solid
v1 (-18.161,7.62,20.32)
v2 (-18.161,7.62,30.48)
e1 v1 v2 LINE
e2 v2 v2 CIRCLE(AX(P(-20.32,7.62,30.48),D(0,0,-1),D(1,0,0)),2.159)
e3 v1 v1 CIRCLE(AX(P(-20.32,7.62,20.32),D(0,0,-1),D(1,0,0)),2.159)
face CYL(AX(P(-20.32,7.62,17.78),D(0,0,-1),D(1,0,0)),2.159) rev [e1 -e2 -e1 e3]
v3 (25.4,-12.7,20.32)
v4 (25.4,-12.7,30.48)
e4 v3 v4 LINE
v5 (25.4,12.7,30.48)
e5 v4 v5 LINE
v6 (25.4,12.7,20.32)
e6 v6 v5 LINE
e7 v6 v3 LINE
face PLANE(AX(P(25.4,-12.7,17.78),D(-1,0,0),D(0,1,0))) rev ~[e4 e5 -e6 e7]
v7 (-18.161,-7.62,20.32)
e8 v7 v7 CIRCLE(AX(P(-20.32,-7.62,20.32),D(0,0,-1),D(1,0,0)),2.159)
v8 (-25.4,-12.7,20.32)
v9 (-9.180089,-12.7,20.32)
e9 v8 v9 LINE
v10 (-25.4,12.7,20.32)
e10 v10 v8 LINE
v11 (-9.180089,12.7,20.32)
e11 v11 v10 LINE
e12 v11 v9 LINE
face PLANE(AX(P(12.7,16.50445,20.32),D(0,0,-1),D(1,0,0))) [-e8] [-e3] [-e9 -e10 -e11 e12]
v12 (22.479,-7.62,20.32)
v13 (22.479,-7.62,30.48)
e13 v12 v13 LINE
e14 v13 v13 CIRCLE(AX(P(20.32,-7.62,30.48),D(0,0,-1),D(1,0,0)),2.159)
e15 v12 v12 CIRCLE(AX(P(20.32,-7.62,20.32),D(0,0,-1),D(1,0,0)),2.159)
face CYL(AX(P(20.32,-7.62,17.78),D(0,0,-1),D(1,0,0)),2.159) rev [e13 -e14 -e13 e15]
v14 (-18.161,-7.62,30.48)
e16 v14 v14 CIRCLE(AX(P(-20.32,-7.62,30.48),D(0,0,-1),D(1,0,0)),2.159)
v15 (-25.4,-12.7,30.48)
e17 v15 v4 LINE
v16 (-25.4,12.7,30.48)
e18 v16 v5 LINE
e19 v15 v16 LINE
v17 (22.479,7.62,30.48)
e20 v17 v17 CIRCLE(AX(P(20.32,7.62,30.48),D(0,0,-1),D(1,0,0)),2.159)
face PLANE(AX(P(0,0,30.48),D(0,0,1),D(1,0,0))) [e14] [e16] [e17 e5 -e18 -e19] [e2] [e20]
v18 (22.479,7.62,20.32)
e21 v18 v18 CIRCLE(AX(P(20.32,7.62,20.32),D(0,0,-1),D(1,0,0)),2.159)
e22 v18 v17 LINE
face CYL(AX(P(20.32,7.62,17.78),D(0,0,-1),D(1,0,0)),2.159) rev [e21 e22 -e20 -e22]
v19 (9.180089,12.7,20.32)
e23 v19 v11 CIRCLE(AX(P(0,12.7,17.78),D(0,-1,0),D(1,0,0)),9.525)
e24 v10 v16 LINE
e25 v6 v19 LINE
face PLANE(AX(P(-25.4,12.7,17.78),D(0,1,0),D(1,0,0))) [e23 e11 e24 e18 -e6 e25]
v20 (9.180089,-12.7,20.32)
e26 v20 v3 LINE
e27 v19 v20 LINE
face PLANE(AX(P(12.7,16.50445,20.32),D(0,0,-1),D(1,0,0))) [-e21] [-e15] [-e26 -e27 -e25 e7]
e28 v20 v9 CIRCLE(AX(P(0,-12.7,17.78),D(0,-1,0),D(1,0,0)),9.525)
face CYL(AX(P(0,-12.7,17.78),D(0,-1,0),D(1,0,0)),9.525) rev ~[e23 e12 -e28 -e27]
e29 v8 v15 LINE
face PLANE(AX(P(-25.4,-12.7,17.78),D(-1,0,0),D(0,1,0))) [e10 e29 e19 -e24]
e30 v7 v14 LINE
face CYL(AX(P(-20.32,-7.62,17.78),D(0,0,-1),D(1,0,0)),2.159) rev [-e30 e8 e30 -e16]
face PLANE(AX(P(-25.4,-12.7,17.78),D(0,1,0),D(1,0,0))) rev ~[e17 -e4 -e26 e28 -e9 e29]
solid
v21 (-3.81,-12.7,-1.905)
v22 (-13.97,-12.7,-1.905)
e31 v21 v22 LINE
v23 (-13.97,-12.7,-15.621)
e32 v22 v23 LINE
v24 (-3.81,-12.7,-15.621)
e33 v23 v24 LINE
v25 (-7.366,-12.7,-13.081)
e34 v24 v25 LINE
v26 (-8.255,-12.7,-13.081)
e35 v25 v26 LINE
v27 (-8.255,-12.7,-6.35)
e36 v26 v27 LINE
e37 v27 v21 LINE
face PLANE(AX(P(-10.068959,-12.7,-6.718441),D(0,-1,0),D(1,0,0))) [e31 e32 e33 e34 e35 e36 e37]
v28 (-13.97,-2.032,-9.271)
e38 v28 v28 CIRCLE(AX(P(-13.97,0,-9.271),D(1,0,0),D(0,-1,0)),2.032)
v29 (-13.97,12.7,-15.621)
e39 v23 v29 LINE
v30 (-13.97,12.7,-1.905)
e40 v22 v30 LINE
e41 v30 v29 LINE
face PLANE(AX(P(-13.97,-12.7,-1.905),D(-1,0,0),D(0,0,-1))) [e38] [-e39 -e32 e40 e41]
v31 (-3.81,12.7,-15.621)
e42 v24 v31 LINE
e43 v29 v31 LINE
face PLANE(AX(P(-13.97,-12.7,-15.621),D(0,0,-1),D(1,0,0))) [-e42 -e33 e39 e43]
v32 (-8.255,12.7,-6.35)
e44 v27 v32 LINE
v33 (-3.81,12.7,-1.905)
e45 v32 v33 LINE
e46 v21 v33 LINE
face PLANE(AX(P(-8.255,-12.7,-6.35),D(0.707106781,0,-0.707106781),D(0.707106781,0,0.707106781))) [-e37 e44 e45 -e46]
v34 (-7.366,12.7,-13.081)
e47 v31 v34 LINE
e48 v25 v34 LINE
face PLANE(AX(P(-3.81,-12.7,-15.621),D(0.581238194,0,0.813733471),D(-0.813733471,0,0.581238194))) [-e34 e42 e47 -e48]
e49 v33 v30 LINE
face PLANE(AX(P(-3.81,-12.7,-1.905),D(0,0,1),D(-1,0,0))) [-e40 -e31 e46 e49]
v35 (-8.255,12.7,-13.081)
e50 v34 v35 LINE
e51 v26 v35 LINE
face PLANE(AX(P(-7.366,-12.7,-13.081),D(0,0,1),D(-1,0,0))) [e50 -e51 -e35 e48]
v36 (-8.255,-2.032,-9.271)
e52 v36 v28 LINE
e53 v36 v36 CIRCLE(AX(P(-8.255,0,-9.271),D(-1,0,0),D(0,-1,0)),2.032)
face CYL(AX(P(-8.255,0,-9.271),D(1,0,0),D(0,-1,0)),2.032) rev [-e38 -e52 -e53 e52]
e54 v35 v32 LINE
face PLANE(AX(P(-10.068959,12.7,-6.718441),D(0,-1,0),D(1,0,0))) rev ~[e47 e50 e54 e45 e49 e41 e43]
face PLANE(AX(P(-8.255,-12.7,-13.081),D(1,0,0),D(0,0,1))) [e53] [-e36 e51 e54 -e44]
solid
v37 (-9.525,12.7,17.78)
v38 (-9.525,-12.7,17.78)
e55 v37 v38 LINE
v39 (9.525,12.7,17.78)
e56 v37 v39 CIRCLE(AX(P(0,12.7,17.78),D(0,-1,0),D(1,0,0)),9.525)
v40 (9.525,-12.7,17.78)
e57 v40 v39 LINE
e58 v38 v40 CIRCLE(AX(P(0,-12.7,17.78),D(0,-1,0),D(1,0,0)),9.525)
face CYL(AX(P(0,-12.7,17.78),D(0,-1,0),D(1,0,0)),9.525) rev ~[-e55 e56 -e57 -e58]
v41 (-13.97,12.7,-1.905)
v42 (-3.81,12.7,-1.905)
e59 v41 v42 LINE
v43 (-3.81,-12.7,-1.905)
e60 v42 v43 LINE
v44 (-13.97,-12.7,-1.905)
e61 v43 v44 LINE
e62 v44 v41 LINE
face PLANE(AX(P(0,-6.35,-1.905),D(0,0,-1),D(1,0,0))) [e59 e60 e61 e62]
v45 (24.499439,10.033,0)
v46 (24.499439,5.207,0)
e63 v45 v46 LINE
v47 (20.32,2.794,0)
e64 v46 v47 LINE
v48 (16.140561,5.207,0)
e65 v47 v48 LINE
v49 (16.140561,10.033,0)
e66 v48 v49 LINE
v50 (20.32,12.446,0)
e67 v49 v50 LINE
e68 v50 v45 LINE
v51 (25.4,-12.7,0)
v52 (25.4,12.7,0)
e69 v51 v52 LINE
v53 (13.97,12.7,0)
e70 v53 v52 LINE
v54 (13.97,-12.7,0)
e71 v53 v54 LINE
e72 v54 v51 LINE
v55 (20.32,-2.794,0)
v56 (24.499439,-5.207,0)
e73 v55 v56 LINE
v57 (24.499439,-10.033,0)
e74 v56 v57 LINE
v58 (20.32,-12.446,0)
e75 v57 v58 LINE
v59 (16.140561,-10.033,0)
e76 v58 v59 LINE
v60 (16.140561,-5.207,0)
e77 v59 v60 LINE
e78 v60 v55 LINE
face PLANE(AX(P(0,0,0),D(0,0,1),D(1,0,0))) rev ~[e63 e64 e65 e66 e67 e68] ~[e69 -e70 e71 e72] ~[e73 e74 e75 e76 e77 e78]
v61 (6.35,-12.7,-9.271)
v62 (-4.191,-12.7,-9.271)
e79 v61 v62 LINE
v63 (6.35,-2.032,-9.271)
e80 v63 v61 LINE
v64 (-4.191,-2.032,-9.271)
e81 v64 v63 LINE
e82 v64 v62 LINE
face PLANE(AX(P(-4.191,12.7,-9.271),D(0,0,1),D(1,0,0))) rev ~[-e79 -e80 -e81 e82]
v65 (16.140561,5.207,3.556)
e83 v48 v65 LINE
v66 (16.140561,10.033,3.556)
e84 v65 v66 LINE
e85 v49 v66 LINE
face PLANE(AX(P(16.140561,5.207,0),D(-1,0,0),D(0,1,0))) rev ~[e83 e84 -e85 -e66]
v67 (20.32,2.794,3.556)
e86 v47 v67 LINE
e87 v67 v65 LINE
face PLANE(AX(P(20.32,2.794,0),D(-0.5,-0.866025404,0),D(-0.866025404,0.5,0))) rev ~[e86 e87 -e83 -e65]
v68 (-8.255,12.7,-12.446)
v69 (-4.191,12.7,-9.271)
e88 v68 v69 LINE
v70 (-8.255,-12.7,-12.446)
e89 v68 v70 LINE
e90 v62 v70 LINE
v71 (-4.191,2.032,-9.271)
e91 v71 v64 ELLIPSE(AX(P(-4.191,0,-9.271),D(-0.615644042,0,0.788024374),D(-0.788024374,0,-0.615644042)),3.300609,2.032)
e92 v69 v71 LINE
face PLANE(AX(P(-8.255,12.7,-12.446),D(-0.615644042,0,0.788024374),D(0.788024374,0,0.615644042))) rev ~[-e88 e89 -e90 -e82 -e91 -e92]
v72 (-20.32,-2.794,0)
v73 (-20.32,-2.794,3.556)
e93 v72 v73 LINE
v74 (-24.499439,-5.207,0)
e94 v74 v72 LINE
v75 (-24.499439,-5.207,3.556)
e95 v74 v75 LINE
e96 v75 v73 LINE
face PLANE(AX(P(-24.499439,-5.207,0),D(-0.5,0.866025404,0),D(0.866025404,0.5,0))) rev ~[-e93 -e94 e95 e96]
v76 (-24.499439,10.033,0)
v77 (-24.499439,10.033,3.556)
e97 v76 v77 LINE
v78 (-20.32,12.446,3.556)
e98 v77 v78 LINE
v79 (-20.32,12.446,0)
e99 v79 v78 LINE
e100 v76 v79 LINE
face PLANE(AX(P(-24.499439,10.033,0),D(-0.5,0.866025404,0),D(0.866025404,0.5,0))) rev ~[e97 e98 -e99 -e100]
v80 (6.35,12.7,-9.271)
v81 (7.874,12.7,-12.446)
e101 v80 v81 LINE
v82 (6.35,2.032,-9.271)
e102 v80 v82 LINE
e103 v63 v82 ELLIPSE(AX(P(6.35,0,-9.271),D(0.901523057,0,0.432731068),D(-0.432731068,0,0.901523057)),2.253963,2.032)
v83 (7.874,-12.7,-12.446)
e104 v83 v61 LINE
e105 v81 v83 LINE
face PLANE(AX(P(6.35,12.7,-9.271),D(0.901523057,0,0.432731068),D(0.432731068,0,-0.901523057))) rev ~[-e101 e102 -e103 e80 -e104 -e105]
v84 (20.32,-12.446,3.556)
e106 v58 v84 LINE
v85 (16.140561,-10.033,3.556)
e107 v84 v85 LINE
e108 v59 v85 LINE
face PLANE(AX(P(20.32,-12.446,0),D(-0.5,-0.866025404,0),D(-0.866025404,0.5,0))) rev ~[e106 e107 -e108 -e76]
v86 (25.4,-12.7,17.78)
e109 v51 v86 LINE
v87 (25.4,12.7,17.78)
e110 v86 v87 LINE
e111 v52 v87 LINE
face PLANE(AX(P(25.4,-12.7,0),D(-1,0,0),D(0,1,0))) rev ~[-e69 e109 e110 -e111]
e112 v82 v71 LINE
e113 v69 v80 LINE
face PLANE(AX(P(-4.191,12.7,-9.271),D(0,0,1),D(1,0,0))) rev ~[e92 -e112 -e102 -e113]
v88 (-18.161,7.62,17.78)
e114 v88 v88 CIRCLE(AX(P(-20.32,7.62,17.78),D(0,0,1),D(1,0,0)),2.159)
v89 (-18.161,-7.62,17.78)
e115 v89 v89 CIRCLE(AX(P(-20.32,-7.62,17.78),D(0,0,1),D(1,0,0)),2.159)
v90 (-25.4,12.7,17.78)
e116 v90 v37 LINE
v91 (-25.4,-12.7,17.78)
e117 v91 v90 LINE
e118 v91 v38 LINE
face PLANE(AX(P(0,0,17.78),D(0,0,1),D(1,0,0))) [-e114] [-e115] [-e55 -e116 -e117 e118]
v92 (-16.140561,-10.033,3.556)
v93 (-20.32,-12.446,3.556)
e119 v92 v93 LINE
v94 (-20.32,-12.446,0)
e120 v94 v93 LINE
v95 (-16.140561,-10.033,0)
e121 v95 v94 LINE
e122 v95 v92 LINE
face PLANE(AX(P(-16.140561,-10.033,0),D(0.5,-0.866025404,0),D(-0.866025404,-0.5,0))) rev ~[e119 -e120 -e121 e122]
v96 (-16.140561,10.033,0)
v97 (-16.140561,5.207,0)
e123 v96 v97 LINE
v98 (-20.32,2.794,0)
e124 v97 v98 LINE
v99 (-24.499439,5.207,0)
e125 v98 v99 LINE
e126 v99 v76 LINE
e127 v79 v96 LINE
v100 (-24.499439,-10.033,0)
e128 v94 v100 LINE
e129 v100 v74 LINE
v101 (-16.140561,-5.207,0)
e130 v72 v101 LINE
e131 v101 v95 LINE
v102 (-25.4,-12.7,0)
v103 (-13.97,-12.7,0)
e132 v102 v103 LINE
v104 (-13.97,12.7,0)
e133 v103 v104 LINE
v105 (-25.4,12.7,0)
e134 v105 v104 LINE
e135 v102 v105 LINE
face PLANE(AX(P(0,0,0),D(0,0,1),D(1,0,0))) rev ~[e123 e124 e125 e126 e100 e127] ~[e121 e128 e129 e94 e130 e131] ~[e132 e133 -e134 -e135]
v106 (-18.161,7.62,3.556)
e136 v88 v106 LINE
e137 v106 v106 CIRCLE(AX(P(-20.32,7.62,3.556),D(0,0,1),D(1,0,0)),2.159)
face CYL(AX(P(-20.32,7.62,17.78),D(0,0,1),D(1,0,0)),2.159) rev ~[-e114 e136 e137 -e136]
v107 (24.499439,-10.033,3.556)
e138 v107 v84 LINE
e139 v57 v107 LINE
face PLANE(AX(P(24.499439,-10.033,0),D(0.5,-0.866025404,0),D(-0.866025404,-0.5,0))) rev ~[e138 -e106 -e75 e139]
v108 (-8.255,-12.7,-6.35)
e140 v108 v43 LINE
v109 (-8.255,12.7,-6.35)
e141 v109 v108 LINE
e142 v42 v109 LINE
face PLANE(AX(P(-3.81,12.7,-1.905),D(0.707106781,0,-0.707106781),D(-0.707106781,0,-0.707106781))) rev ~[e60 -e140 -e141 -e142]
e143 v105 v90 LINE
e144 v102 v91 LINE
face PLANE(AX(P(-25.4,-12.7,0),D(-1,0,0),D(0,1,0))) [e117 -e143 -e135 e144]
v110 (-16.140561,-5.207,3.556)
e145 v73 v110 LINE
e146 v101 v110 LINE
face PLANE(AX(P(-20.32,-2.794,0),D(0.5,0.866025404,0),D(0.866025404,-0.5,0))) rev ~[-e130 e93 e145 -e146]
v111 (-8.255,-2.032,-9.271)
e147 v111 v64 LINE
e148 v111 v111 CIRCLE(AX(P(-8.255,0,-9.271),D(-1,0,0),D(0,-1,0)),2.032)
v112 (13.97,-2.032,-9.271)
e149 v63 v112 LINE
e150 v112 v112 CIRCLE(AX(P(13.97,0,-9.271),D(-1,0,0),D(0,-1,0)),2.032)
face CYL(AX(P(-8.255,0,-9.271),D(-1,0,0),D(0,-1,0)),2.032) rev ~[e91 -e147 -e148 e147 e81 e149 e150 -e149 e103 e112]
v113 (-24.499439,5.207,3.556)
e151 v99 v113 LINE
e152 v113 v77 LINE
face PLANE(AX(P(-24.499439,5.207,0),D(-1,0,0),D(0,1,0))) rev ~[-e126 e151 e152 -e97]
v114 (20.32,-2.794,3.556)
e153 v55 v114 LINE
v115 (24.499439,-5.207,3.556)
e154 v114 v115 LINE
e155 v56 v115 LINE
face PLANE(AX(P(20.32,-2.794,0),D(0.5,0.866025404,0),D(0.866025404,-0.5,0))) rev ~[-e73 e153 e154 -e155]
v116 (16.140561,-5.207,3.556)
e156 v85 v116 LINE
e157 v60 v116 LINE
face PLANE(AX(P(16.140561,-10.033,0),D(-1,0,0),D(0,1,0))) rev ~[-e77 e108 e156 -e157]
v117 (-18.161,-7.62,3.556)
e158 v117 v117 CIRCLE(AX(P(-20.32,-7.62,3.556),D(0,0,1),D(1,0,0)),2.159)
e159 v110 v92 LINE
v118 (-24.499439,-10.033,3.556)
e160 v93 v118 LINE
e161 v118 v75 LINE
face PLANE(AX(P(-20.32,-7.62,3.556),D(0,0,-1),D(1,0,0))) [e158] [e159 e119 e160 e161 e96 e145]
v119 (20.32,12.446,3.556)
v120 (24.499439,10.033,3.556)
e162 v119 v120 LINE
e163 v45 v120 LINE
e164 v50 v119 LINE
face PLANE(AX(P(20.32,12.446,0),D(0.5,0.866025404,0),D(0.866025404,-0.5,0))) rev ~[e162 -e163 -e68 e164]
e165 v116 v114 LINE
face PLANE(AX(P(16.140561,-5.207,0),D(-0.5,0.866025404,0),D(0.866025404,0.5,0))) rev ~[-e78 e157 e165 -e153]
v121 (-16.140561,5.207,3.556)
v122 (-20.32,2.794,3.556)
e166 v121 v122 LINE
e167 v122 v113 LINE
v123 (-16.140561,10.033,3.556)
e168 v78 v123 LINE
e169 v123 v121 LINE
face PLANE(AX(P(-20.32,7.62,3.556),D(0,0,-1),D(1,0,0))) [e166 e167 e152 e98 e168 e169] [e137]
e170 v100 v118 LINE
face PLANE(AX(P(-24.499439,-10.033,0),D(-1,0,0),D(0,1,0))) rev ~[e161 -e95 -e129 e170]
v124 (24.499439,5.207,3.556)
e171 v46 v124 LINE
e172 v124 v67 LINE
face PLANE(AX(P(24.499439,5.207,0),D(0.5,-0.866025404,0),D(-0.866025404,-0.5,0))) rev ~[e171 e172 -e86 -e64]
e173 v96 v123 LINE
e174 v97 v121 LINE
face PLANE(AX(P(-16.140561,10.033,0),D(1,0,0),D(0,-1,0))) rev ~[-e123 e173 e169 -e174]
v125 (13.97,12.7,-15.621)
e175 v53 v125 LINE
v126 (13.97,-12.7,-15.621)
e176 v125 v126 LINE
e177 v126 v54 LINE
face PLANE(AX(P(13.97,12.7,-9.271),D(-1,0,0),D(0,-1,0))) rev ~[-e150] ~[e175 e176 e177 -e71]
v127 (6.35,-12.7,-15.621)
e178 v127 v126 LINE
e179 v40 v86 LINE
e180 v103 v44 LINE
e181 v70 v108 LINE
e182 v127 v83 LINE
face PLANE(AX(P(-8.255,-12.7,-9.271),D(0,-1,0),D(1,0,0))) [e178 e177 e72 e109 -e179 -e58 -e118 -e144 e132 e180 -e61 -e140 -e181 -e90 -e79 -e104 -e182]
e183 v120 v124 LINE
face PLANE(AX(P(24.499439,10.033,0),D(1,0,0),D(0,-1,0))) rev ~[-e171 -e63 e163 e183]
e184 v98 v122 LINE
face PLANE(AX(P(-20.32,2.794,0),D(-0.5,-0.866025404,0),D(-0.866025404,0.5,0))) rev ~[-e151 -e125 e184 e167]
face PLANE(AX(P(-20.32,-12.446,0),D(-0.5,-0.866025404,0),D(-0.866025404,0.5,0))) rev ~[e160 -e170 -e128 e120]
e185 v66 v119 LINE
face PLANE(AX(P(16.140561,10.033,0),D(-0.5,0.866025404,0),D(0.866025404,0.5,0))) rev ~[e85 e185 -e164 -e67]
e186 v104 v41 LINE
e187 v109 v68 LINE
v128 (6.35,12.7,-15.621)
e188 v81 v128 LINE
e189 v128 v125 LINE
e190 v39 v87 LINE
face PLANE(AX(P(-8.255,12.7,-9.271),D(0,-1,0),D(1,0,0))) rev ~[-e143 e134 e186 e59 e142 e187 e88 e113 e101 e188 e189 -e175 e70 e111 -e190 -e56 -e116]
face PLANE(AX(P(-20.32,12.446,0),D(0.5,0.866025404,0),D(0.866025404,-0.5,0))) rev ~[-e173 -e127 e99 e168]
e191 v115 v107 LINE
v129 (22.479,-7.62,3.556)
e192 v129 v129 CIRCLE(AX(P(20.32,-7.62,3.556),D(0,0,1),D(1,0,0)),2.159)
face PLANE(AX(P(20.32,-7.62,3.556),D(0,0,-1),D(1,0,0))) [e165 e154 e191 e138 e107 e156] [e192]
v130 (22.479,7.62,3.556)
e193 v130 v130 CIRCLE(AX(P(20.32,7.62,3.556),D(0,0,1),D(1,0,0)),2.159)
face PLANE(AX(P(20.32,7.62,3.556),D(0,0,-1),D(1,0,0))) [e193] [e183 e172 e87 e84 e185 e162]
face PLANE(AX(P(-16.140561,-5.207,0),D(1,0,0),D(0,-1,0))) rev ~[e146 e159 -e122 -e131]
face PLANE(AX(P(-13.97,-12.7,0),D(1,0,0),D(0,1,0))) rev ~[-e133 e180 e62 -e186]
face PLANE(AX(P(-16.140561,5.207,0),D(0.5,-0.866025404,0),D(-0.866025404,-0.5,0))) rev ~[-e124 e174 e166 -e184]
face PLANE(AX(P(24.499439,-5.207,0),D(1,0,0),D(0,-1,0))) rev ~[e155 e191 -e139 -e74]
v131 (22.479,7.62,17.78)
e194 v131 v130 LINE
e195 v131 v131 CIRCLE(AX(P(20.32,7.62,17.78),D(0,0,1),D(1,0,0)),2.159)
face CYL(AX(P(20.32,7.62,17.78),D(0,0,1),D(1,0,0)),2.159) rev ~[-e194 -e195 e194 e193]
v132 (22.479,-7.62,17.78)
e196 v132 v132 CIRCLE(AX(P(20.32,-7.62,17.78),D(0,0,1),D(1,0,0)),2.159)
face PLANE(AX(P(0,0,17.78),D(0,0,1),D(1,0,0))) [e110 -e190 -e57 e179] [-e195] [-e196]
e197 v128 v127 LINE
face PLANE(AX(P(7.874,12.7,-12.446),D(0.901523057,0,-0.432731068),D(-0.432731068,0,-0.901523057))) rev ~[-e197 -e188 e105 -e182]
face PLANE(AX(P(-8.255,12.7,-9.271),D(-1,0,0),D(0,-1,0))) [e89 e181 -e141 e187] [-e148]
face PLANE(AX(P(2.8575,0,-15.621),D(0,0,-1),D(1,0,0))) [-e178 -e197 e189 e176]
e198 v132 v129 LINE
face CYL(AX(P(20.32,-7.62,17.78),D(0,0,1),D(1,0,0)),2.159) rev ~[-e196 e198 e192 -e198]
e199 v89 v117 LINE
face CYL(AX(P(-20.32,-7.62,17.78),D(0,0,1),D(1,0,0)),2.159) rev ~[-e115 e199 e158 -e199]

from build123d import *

# Parameters (mm, degrees)
F0_W           = 50.8
F0_H           = 25.4
F1_DEPTH       = 17.78
F3_W           = 50.8
F3_H           = 25.4
F4_DEPTH       = 12.7
F2_R           = 9.525
F5_DEPTH       = 76.2
F6_R           = 9.525
F7_DEPTH       = 76.2
F8_W           = 76.2
F8_H           = 58.4089004228
F9_DEPTH       = 2.54
F10_R          = 2.159
F11_DEPTH      = 17.781
F11_DEPTH_BACK = 25.4
F12_R          = 2.159
F13_DEPTH      = 25.4
F13_DEPTH_BACK = 25.4
F15_DEPTH      = 3.556
F16_W          = 27.94
F16_H          = 12.7
F17_DEPTH      = 1.905
F18_W          = 22.225
F18_H          = 25.4
F19_DEPTH      = 7.366
F22_DEPTH      = 50.8
F23_W          = 22.225
F23_H          = 25.4
F24_DEPTH      = 6.35
F26_DEPTH      = 50.8
F28_DEPTH      = 25.4
F20_R          = 2.032
F29_DEPTH      = 50.8
F29_DEPTH_BACK = 25.4


with BuildPart() as f1:
    # F0 (on Top) → F1 (new body)
    with BuildSketch(Plane.XY):
        Rectangle(F0_W, F0_H)
    extrude(amount=F1_DEPTH)


with BuildPart() as f4:
    # F3 (on face) → F4 (new body)
    with BuildSketch(Plane.XY.offset(17.78)):
        Rectangle(F3_W, F3_H)
    extrude(amount=F4_DEPTH)


with BuildPart() as f5_tool:
    # F2 (on face) → F5 (new body)
    with BuildSketch(Plane.XZ.offset(12.7)):
        with Locations((0, 17.78)):
            Circle(F2_R)
    extrude(amount=-F5_DEPTH)


with BuildPart() as f1_1:
    add(f1.part)

    # F5: cut by f5_tool
    add(f5_tool.part, mode=Mode.SUBTRACT)

    # F6 (on face) → F7 (cut)
    with BuildSketch(Plane.XZ.offset(12.7)):
        with Locations((0, 17.78)):
            Circle(F6_R)
    extrude(amount=-F7_DEPTH, mode=Mode.SUBTRACT)


with BuildPart() as f4_1:
    add(f4.part)

    # F5: cut by f5_tool
    add(f5_tool.part, mode=Mode.SUBTRACT)

    # F8 (on face) → F9 (cut)
    with BuildSketch(Plane(origin=(0, 0, 17.78), x_dir=(1, 0, 0), z_dir=(0, 0, -1))):
        with Locations((12.7, -16.5044502114)):
            Rectangle(F8_W, F8_H)
    extrude(amount=-F9_DEPTH, mode=Mode.SUBTRACT)


with BuildPart() as f11_tool:
    # F10 (on face) → F11 (new body, two sides)
    with BuildSketch(Plane.XY.offset(17.78)) as f11_sk:
        with Locations((-20.32, -7.62)):
            Circle(F10_R)
        with Locations((-20.32, 7.62)):
            Circle(F10_R)
    extrude(amount=-F11_DEPTH)
    extrude(f11_sk.sketch, amount=F11_DEPTH_BACK)


with BuildPart() as f1_2:
    add(f1_1.part)

    # F11: cut by f11_tool
    add(f11_tool.part, mode=Mode.SUBTRACT)


with BuildPart() as f4_2:
    add(f4_1.part)

    # F11: cut by f11_tool
    add(f11_tool.part, mode=Mode.SUBTRACT)


with BuildPart() as f13_tool:
    # F12 (on face) → F13 (new body, two sides)
    with BuildSketch(Plane.XY.offset(17.78)) as f13_sk:
        with Locations((20.32, -7.62)):
            Circle(F12_R)
        with Locations((20.32, 7.62)):
            Circle(F12_R)
    extrude(amount=-F13_DEPTH)
    extrude(f13_sk.sketch, amount=F13_DEPTH_BACK)


with BuildPart() as f1_3:
    add(f1_2.part)

    # F13: cut by f13_tool
    add(f13_tool.part, mode=Mode.SUBTRACT)

    # F14 (on face) → F15 (cut)
    with BuildSketch(Plane(origin=(0, 0, 0), x_dir=(1, 0, 0), z_dir=(0, 0, -1))):
        Polygon((-20.32, 2.794), (-16.1405614013, 5.207), (-16.1405614013, 10.033), (-20.32, 12.446), (-24.4994385987, 10.033), (-24.4994385987, 5.207), align=None)
        Polygon((-16.1405614013, -5.207), (-20.32, -2.794), (-24.4994385987, -5.207), (-24.4994385987, -10.033), (-20.32, -12.446), (-16.1405614013, -10.033), align=None)
        Polygon((16.1405614013, 5.207), (20.32, 2.794), (24.4994385987, 5.207), (24.4994385987, 10.033), (20.32, 12.446), (16.1405614013, 10.033), align=None)
        Polygon((24.4994385987, -10.033), (24.4994385987, -5.207), (20.32, -2.794), (16.1405614013, -5.207), (16.1405614013, -10.033), (20.32, -12.446), align=None)
    extrude(amount=-F15_DEPTH, mode=Mode.SUBTRACT)

    # F16 (on face) → F17 (join)
    with BuildSketch(Plane(origin=(0, 0, 0), x_dir=(1, 0, 0), z_dir=(0, 0, -1))):
        with Locations((0, 6.35)):
            Rectangle(F16_W, F16_H)
        with Locations((0, -6.35)):
            Rectangle(F16_W, F16_H)
    extrude(amount=F17_DEPTH)

    # F18 (on face) → F19 (join)
    with BuildSketch(Plane(origin=(0, 0, -1.905), x_dir=(1, 0, 0), z_dir=(0, 0, -1))):
        with Locations((2.8575, 0)):
            Rectangle(F18_W, F18_H)
    extrude(amount=F19_DEPTH)

    # F21 (on face) → F22 (cut)
    with BuildSketch(Plane(origin=(0, 12.7, 0), x_dir=(-1, 0, 0), z_dir=(0, 1, 0))):
        Polygon((8.255, -6.35), (8.255, -1.905), (3.81, -1.905), align=None)
    extrude(amount=-F22_DEPTH, mode=Mode.SUBTRACT)

    # F23 (on face) → F24 (join)
    with BuildSketch(Plane(origin=(0, 0, -9.271), x_dir=(1, 0, 0), z_dir=(0, 0, -1))):
        with Locations((2.8575, 0)):
            Rectangle(F23_W, F23_H)
    extrude(amount=F24_DEPTH)

    # F25 (on face) → F26 (cut)
    with BuildSketch(Plane(origin=(0, 12.7, 0), x_dir=(-1, 0, 0), z_dir=(0, 1, 0))):
        Polygon((4.191, -9.271), (-6.35, -9.271), (-7.874, -12.446), (-6.35, -15.621), (8.255, -15.621), (8.255, -12.446), align=None)
    extrude(amount=-F26_DEPTH, mode=Mode.SUBTRACT)


with BuildPart() as f4_3:
    add(f4_2.part)

    # F13: cut by f13_tool
    add(f13_tool.part, mode=Mode.SUBTRACT)


with BuildPart() as f28:
    # F27 (on face) → F28 (new body)
    with BuildSketch(Plane.XZ.offset(12.7)):
        Polygon((-3.81, -1.905), (-13.97, -1.905), (-13.97, -13.081), (-8.255, -13.081), (-8.255, -12.446), (-8.255, -6.35), align=None)
        Polygon((-8.255, -13.081), (-13.97, -13.081), (-13.97, -15.621), (-3.81, -15.621), (-7.366, -13.081), align=None)
    extrude(amount=-F28_DEPTH)


with BuildPart() as f29_tool:
    # F20 (on face) → F29 (new body, two sides)
    with BuildSketch(Plane(origin=(-8.255, 0, 0), x_dir=(0, -1, 0), z_dir=(-1, 0, 0))) as f29_sk:
        with Locations((0, -9.271)):
            Circle(F20_R)
    extrude(amount=-F29_DEPTH)
    extrude(f29_sk.sketch, amount=F29_DEPTH_BACK)


with BuildPart() as f1_4:
    add(f1_3.part)

    # F29: cut by f29_tool
    add(f29_tool.part, mode=Mode.SUBTRACT)


with BuildPart() as f28_1:
    add(f28.part)

    # F29: cut by f29_tool
    add(f29_tool.part, mode=Mode.SUBTRACT)


solid = Compound([f4_3.part, f1_4.part, f28_1.part])
